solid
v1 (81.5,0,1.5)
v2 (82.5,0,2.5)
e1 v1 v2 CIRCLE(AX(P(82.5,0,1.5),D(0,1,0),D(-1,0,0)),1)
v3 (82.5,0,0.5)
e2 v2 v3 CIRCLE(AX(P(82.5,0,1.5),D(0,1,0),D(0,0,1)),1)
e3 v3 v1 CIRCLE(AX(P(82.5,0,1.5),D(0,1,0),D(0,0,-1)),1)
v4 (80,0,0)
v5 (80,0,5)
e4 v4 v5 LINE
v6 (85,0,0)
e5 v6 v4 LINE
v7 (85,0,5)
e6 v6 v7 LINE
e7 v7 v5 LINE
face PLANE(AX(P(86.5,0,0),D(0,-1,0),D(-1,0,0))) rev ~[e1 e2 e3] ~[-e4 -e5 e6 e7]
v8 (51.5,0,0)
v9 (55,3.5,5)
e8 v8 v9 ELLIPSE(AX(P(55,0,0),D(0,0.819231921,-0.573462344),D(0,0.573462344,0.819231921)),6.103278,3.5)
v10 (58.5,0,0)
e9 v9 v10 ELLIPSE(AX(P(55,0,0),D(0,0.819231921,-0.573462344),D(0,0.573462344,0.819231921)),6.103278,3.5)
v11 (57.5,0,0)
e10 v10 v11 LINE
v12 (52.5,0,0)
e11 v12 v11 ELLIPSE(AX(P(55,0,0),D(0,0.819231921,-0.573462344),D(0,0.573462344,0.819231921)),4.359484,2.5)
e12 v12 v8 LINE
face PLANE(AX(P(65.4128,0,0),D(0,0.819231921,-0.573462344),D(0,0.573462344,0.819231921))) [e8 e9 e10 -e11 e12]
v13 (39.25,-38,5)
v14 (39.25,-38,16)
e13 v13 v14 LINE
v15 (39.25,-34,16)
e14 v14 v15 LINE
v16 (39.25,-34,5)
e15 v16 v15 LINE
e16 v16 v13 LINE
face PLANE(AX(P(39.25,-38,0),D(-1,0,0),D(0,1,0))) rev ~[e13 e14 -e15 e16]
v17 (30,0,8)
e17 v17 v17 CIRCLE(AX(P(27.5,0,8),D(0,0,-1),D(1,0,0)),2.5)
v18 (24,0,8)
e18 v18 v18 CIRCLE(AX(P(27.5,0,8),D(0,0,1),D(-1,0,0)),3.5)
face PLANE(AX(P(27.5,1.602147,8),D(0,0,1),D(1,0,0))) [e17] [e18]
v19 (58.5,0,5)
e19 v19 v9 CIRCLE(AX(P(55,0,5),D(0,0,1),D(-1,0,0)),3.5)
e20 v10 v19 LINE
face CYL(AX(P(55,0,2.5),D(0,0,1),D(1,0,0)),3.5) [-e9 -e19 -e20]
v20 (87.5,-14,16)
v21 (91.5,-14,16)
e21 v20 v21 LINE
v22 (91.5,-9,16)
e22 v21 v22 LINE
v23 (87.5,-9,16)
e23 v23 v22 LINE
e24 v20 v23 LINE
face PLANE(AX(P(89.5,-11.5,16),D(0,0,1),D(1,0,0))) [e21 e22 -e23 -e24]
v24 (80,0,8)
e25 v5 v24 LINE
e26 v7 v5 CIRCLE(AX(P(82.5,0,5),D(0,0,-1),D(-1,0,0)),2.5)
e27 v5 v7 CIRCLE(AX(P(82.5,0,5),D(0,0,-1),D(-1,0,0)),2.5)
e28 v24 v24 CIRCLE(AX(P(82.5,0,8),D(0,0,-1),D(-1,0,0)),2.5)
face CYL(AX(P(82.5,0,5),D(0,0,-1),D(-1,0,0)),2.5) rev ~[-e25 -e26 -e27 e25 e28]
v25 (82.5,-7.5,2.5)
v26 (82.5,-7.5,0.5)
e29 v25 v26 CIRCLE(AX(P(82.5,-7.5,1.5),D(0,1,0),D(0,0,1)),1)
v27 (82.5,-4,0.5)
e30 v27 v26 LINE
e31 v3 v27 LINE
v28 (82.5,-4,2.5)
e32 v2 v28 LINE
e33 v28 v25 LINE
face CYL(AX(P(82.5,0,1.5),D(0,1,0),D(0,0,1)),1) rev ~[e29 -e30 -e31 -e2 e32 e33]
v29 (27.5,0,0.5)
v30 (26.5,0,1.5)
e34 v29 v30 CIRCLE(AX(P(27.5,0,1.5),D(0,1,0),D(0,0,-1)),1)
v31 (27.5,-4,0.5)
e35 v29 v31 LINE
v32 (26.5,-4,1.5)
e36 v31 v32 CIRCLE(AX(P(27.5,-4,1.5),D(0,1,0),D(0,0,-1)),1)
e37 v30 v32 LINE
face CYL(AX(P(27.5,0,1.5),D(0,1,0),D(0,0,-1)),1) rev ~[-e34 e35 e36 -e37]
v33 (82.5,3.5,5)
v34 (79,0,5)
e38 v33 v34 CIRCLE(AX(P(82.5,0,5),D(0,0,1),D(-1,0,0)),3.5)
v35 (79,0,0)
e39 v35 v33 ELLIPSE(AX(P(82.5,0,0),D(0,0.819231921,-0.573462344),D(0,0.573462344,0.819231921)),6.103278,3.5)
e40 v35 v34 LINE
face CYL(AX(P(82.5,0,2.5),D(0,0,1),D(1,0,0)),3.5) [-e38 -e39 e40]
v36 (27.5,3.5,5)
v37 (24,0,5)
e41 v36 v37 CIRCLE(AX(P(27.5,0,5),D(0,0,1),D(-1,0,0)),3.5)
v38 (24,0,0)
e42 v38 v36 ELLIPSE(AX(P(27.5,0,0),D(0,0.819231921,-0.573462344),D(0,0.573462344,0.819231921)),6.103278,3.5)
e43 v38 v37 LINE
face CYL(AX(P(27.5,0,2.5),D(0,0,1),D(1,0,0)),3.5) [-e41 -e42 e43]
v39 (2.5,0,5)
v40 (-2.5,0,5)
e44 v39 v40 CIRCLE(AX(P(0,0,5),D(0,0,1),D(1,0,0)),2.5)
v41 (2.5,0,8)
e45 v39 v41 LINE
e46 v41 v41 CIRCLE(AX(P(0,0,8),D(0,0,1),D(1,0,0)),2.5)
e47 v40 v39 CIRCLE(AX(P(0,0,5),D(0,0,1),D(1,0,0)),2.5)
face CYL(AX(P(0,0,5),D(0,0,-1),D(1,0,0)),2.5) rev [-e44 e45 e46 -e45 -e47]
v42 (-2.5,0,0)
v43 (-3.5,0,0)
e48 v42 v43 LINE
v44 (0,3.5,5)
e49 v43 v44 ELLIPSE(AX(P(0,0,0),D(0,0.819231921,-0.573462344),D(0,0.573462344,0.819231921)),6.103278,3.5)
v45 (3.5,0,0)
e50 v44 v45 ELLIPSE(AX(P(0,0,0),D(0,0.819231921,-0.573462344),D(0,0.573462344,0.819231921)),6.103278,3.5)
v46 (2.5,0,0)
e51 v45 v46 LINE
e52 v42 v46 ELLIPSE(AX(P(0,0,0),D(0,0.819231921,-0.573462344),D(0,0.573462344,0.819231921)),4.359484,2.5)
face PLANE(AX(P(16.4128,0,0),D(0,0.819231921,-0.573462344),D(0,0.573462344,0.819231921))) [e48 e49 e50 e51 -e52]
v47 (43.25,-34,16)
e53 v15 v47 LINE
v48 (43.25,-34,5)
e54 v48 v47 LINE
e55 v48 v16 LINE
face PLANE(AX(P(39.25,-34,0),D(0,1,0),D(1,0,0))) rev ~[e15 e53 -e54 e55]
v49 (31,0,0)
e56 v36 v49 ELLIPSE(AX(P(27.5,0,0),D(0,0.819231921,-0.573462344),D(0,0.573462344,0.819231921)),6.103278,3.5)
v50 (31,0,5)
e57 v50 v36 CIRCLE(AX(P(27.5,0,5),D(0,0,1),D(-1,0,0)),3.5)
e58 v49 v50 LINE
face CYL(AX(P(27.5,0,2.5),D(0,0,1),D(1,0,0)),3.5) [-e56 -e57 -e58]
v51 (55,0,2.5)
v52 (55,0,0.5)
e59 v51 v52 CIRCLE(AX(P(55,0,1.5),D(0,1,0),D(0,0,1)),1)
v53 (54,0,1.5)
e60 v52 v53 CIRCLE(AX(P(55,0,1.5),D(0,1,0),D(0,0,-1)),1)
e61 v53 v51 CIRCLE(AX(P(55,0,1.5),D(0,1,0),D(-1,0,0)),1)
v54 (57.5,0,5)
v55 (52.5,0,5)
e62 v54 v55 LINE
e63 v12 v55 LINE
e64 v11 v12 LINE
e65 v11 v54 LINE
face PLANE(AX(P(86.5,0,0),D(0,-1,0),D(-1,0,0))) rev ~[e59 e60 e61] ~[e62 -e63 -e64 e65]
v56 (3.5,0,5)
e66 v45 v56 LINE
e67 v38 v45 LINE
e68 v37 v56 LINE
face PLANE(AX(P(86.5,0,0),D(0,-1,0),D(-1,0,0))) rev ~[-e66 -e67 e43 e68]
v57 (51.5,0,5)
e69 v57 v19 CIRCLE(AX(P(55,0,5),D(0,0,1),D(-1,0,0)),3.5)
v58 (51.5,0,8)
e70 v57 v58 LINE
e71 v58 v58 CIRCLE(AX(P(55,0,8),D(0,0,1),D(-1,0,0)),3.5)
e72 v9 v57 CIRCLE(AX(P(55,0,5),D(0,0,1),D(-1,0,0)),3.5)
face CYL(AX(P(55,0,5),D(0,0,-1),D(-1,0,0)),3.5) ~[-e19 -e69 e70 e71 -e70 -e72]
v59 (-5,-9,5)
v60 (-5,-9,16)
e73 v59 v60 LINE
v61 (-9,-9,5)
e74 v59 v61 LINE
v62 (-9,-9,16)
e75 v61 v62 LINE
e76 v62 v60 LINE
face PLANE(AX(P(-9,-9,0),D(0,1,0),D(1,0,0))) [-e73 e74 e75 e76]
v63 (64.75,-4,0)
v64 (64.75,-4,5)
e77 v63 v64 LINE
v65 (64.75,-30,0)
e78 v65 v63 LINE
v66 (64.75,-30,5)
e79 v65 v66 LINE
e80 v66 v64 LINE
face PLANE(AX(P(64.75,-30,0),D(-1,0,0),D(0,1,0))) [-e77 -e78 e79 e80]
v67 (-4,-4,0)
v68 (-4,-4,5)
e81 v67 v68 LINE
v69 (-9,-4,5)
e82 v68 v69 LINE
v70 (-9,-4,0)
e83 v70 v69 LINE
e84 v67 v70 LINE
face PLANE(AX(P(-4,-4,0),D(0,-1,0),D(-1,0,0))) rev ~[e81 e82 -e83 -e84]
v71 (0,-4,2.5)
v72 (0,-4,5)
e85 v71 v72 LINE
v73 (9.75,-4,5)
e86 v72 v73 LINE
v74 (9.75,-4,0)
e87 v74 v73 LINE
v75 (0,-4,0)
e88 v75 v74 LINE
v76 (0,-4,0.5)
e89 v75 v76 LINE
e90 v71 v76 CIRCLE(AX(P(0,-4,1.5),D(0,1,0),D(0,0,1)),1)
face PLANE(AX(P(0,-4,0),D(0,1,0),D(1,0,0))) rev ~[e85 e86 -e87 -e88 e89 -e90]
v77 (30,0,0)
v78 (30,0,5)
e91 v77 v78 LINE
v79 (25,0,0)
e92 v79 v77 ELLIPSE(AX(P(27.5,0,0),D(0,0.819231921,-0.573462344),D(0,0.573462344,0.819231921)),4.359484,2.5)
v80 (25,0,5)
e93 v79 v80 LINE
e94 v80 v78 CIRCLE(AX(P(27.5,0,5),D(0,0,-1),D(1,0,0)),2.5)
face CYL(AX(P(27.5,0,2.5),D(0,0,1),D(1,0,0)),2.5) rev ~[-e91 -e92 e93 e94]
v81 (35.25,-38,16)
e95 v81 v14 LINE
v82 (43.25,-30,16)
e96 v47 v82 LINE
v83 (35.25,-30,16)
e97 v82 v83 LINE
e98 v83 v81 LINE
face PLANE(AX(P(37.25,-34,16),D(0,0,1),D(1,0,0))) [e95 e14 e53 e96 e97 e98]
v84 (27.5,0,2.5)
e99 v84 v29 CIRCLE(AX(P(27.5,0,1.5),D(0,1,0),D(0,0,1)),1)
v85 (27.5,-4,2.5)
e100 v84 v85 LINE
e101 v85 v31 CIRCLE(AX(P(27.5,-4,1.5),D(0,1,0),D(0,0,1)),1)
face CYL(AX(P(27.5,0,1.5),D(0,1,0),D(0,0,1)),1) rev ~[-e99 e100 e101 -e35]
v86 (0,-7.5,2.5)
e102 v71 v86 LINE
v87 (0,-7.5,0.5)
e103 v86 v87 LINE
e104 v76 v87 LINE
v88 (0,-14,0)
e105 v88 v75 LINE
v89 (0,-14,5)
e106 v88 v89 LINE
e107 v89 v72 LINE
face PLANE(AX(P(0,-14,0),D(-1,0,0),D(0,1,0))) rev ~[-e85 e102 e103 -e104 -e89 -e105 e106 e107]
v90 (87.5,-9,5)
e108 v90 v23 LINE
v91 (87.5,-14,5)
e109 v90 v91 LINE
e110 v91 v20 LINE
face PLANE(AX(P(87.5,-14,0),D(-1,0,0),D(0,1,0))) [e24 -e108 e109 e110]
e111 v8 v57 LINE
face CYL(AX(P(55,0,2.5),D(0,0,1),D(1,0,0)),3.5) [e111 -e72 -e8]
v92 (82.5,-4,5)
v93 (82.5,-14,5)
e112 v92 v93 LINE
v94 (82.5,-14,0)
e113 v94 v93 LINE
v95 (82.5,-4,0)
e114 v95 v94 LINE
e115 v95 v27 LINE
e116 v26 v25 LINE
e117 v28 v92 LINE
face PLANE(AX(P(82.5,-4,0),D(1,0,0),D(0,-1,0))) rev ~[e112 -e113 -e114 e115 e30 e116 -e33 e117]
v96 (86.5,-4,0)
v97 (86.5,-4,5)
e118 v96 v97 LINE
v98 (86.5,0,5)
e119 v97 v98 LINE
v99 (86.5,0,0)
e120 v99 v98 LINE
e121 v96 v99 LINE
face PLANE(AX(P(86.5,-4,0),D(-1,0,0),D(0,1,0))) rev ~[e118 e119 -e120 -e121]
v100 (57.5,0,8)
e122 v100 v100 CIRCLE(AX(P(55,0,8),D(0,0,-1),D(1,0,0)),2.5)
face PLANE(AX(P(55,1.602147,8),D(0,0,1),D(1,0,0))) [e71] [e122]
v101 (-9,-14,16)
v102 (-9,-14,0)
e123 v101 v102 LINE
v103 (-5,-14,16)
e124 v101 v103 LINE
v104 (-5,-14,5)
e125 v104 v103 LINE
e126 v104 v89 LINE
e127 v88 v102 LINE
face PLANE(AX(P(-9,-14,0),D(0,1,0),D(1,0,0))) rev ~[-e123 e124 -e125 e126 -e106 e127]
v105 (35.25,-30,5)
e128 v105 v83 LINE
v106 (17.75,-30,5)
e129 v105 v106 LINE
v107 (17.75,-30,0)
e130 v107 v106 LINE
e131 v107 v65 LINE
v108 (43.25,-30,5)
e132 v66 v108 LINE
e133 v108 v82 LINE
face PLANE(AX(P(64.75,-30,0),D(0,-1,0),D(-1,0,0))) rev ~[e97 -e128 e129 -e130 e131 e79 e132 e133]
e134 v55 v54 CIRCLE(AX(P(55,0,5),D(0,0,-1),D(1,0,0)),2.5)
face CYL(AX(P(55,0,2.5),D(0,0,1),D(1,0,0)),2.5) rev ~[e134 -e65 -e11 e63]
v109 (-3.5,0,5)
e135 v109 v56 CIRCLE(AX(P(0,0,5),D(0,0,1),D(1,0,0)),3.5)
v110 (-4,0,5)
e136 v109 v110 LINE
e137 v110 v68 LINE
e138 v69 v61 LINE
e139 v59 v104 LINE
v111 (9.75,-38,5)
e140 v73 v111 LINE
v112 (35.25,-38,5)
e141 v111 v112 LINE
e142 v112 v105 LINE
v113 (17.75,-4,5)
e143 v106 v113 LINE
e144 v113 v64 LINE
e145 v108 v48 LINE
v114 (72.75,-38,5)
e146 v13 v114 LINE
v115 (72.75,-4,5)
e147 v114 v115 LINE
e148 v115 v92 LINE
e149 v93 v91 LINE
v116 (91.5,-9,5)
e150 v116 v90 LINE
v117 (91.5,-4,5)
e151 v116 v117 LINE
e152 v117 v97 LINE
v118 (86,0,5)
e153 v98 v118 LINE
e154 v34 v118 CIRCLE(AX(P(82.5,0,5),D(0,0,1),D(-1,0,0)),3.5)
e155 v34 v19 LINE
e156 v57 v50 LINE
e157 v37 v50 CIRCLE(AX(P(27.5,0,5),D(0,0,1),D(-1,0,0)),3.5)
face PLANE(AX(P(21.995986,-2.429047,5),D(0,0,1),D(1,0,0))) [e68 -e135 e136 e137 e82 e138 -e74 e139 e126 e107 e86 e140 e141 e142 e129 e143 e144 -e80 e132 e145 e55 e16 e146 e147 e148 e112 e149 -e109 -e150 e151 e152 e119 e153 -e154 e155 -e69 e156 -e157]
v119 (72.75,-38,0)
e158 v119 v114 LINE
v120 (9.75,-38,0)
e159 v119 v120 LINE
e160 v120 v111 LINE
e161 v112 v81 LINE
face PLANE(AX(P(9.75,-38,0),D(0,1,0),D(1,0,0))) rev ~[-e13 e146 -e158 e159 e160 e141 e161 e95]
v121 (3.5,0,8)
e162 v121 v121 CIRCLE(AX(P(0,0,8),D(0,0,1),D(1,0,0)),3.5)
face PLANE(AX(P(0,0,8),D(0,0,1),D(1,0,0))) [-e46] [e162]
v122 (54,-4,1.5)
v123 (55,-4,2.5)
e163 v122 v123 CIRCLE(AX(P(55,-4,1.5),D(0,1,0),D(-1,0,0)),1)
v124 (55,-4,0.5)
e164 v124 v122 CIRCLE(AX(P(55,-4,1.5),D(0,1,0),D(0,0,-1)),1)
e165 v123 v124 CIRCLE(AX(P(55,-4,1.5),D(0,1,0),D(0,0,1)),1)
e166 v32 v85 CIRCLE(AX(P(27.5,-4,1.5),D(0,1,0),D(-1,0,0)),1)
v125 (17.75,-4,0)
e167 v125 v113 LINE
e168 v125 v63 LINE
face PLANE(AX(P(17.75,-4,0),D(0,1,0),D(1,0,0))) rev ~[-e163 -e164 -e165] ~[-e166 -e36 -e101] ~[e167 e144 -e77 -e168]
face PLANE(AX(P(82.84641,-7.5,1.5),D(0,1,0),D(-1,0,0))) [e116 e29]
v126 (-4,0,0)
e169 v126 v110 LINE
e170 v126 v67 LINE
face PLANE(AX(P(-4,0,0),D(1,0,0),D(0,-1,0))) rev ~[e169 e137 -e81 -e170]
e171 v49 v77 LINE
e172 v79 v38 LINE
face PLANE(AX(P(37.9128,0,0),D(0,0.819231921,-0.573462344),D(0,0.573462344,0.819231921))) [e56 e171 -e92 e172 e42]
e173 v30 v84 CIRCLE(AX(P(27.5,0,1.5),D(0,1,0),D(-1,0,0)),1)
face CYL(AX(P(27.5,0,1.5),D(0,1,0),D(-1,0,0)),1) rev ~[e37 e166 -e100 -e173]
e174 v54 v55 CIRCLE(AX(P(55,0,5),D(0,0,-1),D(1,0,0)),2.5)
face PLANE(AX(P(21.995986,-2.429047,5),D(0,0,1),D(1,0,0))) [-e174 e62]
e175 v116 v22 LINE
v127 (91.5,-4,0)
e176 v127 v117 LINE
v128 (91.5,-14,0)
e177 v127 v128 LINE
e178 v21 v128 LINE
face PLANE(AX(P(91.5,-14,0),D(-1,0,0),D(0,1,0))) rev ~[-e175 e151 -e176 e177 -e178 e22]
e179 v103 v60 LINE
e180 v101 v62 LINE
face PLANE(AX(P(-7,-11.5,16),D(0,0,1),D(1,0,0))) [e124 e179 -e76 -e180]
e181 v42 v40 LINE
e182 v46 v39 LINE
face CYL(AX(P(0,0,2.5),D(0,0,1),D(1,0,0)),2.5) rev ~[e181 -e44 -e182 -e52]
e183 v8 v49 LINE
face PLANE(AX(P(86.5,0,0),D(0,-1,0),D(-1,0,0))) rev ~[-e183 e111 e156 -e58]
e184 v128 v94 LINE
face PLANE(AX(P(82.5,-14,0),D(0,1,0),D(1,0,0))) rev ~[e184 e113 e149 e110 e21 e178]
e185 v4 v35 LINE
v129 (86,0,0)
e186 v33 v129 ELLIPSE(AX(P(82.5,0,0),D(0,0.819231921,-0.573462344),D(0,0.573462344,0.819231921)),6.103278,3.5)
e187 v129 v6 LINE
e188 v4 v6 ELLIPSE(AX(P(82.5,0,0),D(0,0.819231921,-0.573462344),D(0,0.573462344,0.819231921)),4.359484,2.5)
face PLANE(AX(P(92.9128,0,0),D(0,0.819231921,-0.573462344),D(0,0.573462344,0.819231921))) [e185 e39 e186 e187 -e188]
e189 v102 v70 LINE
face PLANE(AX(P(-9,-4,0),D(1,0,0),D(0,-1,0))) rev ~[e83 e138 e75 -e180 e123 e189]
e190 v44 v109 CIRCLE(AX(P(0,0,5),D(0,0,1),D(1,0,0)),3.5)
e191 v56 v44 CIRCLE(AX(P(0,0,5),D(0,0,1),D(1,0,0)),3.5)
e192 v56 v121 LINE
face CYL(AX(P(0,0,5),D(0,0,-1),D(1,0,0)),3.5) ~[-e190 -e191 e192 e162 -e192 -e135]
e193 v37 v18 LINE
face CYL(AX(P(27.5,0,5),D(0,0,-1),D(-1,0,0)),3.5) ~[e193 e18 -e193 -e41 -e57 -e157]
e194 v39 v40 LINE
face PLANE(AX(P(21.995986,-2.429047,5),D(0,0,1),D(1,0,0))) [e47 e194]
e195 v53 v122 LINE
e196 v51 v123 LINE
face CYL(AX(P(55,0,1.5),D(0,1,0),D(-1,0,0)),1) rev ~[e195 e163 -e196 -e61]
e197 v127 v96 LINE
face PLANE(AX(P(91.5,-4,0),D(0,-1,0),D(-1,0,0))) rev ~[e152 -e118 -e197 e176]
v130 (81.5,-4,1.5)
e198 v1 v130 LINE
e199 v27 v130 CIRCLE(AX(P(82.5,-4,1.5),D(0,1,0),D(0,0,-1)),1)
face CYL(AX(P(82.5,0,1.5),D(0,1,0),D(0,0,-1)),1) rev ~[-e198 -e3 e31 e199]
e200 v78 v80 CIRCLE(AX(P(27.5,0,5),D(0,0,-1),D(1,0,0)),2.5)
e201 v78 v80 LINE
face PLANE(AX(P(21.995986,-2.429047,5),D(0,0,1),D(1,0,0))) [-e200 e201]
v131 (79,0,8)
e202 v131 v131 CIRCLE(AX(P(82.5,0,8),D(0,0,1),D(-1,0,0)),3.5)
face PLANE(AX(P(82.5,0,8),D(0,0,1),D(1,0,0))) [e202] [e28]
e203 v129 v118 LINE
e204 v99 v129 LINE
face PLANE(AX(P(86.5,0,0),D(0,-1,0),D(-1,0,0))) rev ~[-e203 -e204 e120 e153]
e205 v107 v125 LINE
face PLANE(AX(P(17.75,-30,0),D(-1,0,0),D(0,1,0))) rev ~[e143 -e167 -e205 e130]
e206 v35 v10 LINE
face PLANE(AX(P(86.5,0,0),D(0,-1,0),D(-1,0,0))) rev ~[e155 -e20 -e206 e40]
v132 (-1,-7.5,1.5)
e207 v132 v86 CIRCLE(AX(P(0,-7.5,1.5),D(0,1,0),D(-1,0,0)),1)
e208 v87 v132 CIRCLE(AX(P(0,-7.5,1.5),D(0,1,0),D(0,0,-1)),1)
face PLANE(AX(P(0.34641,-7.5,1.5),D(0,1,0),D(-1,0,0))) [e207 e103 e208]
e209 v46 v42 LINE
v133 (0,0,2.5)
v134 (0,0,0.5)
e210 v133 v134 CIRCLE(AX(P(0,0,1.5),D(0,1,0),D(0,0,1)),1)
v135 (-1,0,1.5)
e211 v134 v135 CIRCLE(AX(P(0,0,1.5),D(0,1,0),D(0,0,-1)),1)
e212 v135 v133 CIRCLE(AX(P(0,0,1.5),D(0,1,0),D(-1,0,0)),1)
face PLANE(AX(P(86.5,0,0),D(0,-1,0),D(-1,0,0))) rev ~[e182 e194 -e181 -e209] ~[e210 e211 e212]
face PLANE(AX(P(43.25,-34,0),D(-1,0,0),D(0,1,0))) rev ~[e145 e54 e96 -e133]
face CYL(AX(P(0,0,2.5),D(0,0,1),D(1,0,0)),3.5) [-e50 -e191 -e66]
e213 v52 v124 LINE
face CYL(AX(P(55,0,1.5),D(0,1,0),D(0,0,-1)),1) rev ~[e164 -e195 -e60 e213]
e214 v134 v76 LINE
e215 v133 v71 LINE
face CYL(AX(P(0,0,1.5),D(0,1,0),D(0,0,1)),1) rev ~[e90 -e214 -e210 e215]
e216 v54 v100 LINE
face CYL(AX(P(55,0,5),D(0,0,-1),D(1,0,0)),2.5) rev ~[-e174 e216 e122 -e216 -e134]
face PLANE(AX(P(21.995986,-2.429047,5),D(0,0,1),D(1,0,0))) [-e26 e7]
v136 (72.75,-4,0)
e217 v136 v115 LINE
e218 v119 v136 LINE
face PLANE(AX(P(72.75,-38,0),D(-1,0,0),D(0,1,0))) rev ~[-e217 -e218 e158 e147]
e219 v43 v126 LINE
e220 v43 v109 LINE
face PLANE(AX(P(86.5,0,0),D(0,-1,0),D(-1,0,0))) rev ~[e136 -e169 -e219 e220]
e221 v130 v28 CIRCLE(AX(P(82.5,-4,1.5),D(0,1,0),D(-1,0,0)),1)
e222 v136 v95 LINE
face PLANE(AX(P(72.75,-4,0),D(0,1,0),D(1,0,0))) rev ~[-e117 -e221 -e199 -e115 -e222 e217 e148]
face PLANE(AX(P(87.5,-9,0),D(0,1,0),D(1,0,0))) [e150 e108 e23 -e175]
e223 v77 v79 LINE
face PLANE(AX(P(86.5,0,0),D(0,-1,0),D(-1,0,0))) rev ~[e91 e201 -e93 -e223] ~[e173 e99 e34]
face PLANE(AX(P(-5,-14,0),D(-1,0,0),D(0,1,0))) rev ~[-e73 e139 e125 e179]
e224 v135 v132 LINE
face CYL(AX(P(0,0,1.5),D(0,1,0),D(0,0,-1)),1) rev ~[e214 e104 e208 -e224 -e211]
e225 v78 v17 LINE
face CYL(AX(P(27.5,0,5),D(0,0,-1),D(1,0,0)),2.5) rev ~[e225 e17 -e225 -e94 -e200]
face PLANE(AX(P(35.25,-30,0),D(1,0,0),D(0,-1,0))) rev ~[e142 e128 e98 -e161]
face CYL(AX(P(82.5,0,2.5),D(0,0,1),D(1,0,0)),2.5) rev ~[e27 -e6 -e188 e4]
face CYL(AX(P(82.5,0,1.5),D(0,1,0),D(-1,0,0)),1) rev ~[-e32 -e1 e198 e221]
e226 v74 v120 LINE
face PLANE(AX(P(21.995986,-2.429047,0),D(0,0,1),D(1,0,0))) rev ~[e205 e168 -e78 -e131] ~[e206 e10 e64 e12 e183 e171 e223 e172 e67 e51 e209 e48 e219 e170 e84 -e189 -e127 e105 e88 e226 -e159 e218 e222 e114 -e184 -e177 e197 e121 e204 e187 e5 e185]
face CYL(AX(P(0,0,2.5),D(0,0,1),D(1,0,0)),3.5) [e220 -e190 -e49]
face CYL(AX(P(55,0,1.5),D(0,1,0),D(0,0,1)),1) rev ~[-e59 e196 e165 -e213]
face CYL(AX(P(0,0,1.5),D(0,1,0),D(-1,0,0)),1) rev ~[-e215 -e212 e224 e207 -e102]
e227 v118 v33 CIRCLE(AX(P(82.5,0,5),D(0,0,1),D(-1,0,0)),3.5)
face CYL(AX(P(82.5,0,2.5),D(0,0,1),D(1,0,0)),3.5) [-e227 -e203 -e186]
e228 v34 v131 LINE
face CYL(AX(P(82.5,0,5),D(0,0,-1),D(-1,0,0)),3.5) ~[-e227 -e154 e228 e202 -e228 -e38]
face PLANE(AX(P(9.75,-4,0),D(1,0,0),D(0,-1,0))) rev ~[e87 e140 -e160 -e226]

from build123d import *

# Parameters (mm, degrees)
F0_W         = 4
F0_H         = 26
F0_W_2       = 2
F0_H_2       = 4
F0_H_3       = 5
F1_DEPTH     = 5
F2_DEPTH     = 16
F3_R         = 3.5
F3_R_2       = 2.5
F4_DEPTH     = 3
F6_DEPTH     = 7.5
F7_T4_DEPTH  = 26.8255996257
F7_S5_R      = 3.5
F7_T6_DEPTH  = 15
F7_S7_R      = 2.5
F7_T8_DEPTH  = 15
F7_T12_DEPTH = 26.8255996257
F7_S13_R     = 3.5
F7_T14_DEPTH = 15
F7_S15_R     = 2.5
F7_T16_DEPTH = 15
F7_T20_DEPTH = 26.8255996257
F7_S21_R     = 3.5
F7_T22_DEPTH = 15
F7_S23_R     = 2.5
F7_T24_DEPTH = 15
F7_T28_DEPTH = 26.8255996257
F7_S29_R     = 3.5
F7_T30_DEPTH = 15
F7_S31_R     = 2.5
F7_T32_DEPTH = 15
F7_T36_DEPTH = 26.8255996257
F7_S37_R     = 3.5
F7_T38_DEPTH = 15
F7_S39_R     = 2.5
F7_T40_DEPTH = 15
F7_T44_DEPTH = 26.8255996257
F7_S45_R     = 3.5
F7_T46_DEPTH = 15
F7_S47_R     = 2.5
F7_T48_DEPTH = 15
F7_T52_DEPTH = 26.8255996257
F7_S53_R     = 3.5
F7_T54_DEPTH = 15
F7_S55_R     = 2.5
F7_T56_DEPTH = 15
F7_T60_DEPTH = 26.8255996257
F7_S61_R     = 3.5
F7_T62_DEPTH = 15
F7_S63_R     = 2.5
F7_T64_DEPTH = 15


# Not quite as in the source:
# - a fillet or chamfer that OpenCascade refuses, or shapes differently, is made with other operations: its cross-section is extruded or revolved along the edge and cut away or added


with BuildPart() as f1:
    # F0 (on Top) → F1 (new body)
    with BuildSketch(Plane.XY):
        with BuildLine():
            ThreePointArc((27.5, -4), (24.6715728753, -2.8284271247), (23.5, 0))
            Line((23.5, 0), (17.75, 0))
            Line((17.75, 0), (17.75, -4))
            Line((17.75, -4), (27.5, -4))
        make_face()
        with Locations((15.75, -17)):
            Rectangle(F0_W, F0_H)
        with BuildLine():
            Line((52.5, 0), (51, 0))
            ThreePointArc((51, 0), (52.1715728753, -2.8284271247), (55, -4))
            Line((55, -4), (55, -2.5))
            ThreePointArc((55, -2.5), (53.232233047, -1.767766953), (52.5, 0))
        make_face()
        with Locations((42.25, -32)):
            Rectangle(F0_W_2, F0_H_2)
        with BuildLine():
            ThreePointArc((82.5, -2.5), (84.267766953, -1.767766953), (85, 0))
            Line((85, 0), (82.5, 0))
            Line((82.5, 0), (82.5, -2.5))
        make_face()
        with BuildLine():
            Line((82.5, 0), (80, 0))
            ThreePointArc((80, 0), (80.732233047, -1.767766953), (82.5, -2.5))
            Line((82.5, -2.5), (82.5, 0))
        make_face()
        Polygon((47.25, -38), (47.25, -30), (43.25, -30), (43.25, -34), (43.25, -38), align=None)
        with BuildLine():
            Line((64.75, 0), (59, 0))
            ThreePointArc((59, 0), (57.8284271247, -2.8284271247), (55, -4))
            Line((55, -4), (64.75, -4))
            Line((64.75, -4), (64.75, 0))
        make_face()
        with Locations((11.75, -2)):
            Rectangle(F0_W, F0_H_2)
        with Locations((42.25, -36)):
            Rectangle(F0_W_2, F0_H_2)
        with Locations((40.25, -32)):
            Rectangle(F0_W_2, F0_H_2)
        with Locations((11.75, -17)):
            Rectangle(F0_W, F0_H)
        with Locations((70.75, -2)):
            Rectangle(F0_W, F0_H_2)
        with BuildLine():
            Line((25, 0), (23.5, 0))
            ThreePointArc((23.5, 0), (24.6715728753, -2.8284271247), (27.5, -4))
            Line((27.5, -4), (27.5, -2.5))
            ThreePointArc((27.5, -2.5), (25.732233047, -1.767766953), (25, 0))
        make_face()
        with Locations((40.25, -36)):
            Rectangle(F0_W_2, F0_H_2)
        Polygon((35.25, -30), (35.25, -38), (39.25, -38), (39.25, -34), (39.25, -30), align=None)
        with BuildLine():
            ThreePointArc((55, -4), (57.8284271247, -2.8284271247), (59, 0))
            Line((59, 0), (57.5, 0))
            ThreePointArc((57.5, 0), (56.767766953, -1.767766953), (55, -2.5))
            Line((55, -2.5), (55, -4))
        make_face()
        with Locations((70.75, -17)):
            Rectangle(F0_W, F0_H)
        with Locations((66.75, -2)):
            Rectangle(F0_W, F0_H_2)
        with BuildLine():
            Line((55, 0), (52.5, 0))
            ThreePointArc((52.5, 0), (53.232233047, -1.767766953), (55, -2.5))
            Line((55, -2.5), (55, 0))
        make_face()
        with BuildLine():
            Line((0, -4), (0, -2.5))
            ThreePointArc((0, -2.5), (-1.767766953, -1.767766953), (-2.5, 0))
            Line((-2.5, 0), (-4, 0))
            ThreePointArc((-4, 0), (-2.8284271247, -2.8284271247), (0, -4))
        make_face()
        Polygon((86.5, -4), (82.5, -4), (82.5, -14), (87.5, -14), (87.5, -9), (87.5, -4), align=None)
        with BuildLine():
            Line((-4, -4), (0, -4))
            ThreePointArc((0, -4), (-2.8284271247, -2.8284271247), (-4, 0))
            Line((-4, 0), (-4, -4))
        make_face()
        with BuildLine():
            Line((86.5, -4), (86.5, 0))
            ThreePointArc((86.5, 0), (85.3284271247, -2.8284271247), (82.5, -4))
            Line((82.5, -4), (86.5, -4))
        make_face()
        with Locations((-7, -6.5)):
            Rectangle(F0_W, F0_H_3)
        with Locations((89.5, -6.5)):
            Rectangle(F0_W, F0_H_3)
        with Locations((-7, -11.5)):
            Rectangle(F0_W, F0_H_3)
        with Locations((89.5, -11.5)):
            Rectangle(F0_W, F0_H_3)
        with BuildLine():
            Line((2.5, 0), (0, 0))
            Line((0, 0), (0, -2.5))
            ThreePointArc((0, -2.5), (1.767766953, -1.767766953), (2.5, 0))
        make_face()
        with BuildLine():
            Line((9.75, 0), (4, 0))
            ThreePointArc((4, 0), (2.8284271247, -2.8284271247), (0, -4))
            Line((0, -4), (9.75, -4))
            Line((9.75, -4), (9.75, 0))
        make_face()
        with BuildLine():
            Line((27.5, 0), (25, 0))
            ThreePointArc((25, 0), (25.732233047, -1.767766953), (27.5, -2.5))
            Line((27.5, -2.5), (27.5, 0))
        make_face()
        with BuildLine():
            ThreePointArc((27.5, -2.5), (29.267766953, -1.767766953), (30, 0))
            Line((30, 0), (27.5, 0))
            Line((27.5, 0), (27.5, -2.5))
        make_face()
        with Locations((66.75, -17)):
            Rectangle(F0_W, F0_H)
        with BuildLine():
            ThreePointArc((27.5, -4), (30.3284271247, -2.8284271247), (31.5, 0))
            Line((31.5, 0), (30, 0))
            ThreePointArc((30, 0), (29.267766953, -1.767766953), (27.5, -2.5))
            Line((27.5, -2.5), (27.5, -4))
        make_face()
        with BuildLine():
            Line((0, -2.5), (0, 0))
            Line((0, 0), (-2.5, 0))
            ThreePointArc((-2.5, 0), (-1.767766953, -1.767766953), (0, -2.5))
        make_face()
        with BuildLine():
            ThreePointArc((55, -2.5), (56.767766953, -1.767766953), (57.5, 0))
            Line((57.5, 0), (55, 0))
            Line((55, 0), (55, -2.5))
        make_face()
        with BuildLine():
            ThreePointArc((82.5, -4), (85.3284271247, -2.8284271247), (86.5, 0))
            Line((86.5, 0), (85, 0))
            ThreePointArc((85, 0), (84.267766953, -1.767766953), (82.5, -2.5))
            Line((82.5, -2.5), (82.5, -4))
        make_face()
        Polygon((13.75, -30), (9.75, -30), (9.75, -38), (35.25, -38), (35.25, -30), (17.75, -30), align=None)
        with BuildLine():
            Line((51, 0), (31.5, 0))
            ThreePointArc((31.5, 0), (30.3284271247, -2.8284271247), (27.5, -4))
            Line((27.5, -4), (55, -4))
            ThreePointArc((55, -4), (52.1715728753, -2.8284271247), (51, 0))
        make_face()
        with BuildLine():
            ThreePointArc((82.5, -4), (79.6715728753, -2.8284271247), (78.5, 0))
            Line((78.5, 0), (72.75, 0))
            Line((72.75, 0), (72.75, -4))
            Line((72.75, -4), (82.5, -4))
        make_face()
        with Locations((15.75, -2)):
            Rectangle(F0_W, F0_H_2)
        with BuildLine():
            Line((4, 0), (2.5, 0))
            ThreePointArc((2.5, 0), (1.767766953, -1.767766953), (0, -2.5))
            Line((0, -2.5), (0, -4))
            ThreePointArc((0, -4), (2.8284271247, -2.8284271247), (4, 0))
        make_face()
        Polygon((68.75, -30), (64.75, -30), (47.25, -30), (47.25, -38), (72.75, -38), (72.75, -30), align=None)
        Polygon((0, -14), (0, -4), (-4, -4), (-5, -4), (-5, -9), (-5, -14), align=None)
        with BuildLine():
            Line((80, 0), (78.5, 0))
            ThreePointArc((78.5, 0), (79.6715728753, -2.8284271247), (82.5, -4))
            Line((82.5, -4), (82.5, -2.5))
            ThreePointArc((82.5, -2.5), (80.732233047, -1.767766953), (80, 0))
        make_face()
    extrude(amount=F1_DEPTH)

    # F0 (on Top) → F2 (join)
    with BuildSketch(Plane.XY):
        with Locations((-7, -11.5)):
            Rectangle(F0_W, F0_H_3)
        with Locations((89.5, -11.5)):
            Rectangle(F0_W, F0_H_3)
        Polygon((35.25, -30), (35.25, -38), (39.25, -38), (39.25, -34), (39.25, -30), align=None)
        with Locations((40.25, -32)):
            Rectangle(F0_W_2, F0_H_2)
        with Locations((42.25, -32)):
            Rectangle(F0_W_2, F0_H_2)
    extrude(amount=F2_DEPTH)

    # F3 (on face) → F4 (join)
    with BuildSketch(Plane.XY.offset(5)):
        Circle(F3_R)
        Circle(F3_R_2, mode=Mode.SUBTRACT)
        with BuildLine():
            ThreePointArc((86, 0), (82.5, 3.5), (79, 0))
            ThreePointArc((79, 0), (82.5, -3.5), (86, 0))
        make_face()
        with BuildLine():
            ThreePointArc((85, 0), (82.5, -2.5), (80, 0))
            ThreePointArc((80, 0), (82.5, 2.5), (85, 0))
        make_face(mode=Mode.SUBTRACT)
        with BuildLine():
            ThreePointArc((58.5, 0), (55, 3.5), (51.5, 0))
            Line((51.5, 0), (52.5, 0))
            ThreePointArc((52.5, 0), (55, 2.5), (57.5, 0))
            Line((57.5, 0), (58.5, 0))
        make_face()
        with BuildLine():
            Line((52.5, 0), (51.5, 0))
            ThreePointArc((51.5, 0), (55, -3.5), (58.5, 0))
            Line((58.5, 0), (57.5, 0))
            ThreePointArc((57.5, 0), (55, -2.5), (52.5, 0))
        make_face()
        with BuildLine():
            ThreePointArc((31, 0), (27.5, 3.5), (24, 0))
            Line((24, 0), (25, 0))
            ThreePointArc((25, 0), (27.5, 2.5), (30, 0))
            Line((30, 0), (31, 0))
        make_face()
        with BuildLine():
            Line((25, 0), (24, 0))
            ThreePointArc((24, 0), (27.5, -3.5), (31, 0))
            Line((31, 0), (30, 0))
            ThreePointArc((30, 0), (27.5, -2.5), (25, 0))
        make_face()
    extrude(amount=F4_DEPTH)

    # F5 (on face) → F6 (cut)
    with BuildSketch(Plane(origin=(0, 0, 0), x_dir=(-1, 0, 0), z_dir=(0, 1, 0))):
        with BuildLine():
            ThreePointArc((0, 2.5), (-1, 1.5), (0, 0.5))
            Line((0, 0.5), (0, 2.5))
        make_face()
        with BuildLine():
            Line((0, 2.5), (0, 0.5))
            ThreePointArc((0, 0.5), (0.7071067812, 0.7928932188), (1, 1.5))
            ThreePointArc((1, 1.5), (0.7071067812, 2.2071067812), (0, 2.5))
        make_face()
        with BuildLine():
            ThreePointArc((-82.5, 2.5), (-83.5, 1.5), (-82.5, 0.5))
            Line((-82.5, 0.5), (-82.5, 2.5))
        make_face()
        with BuildLine():
            Line((-82.5, 2.5), (-82.5, 0.5))
            ThreePointArc((-82.5, 0.5), (-81.7928932188, 0.7928932188), (-81.5, 1.5))
            ThreePointArc((-81.5, 1.5), (-81.7928932188, 2.2071067812), (-82.5, 2.5))
        make_face()
        with BuildLine():
            ThreePointArc((-55, 2.5), (-56, 1.5), (-55, 0.5))
            Line((-55, 0.5), (-55, 2.5))
        make_face()
        with BuildLine():
            Line((-55, 2.5), (-55, 0.5))
            ThreePointArc((-55, 0.5), (-54.2928932188, 0.7928932188), (-54, 1.5))
            ThreePointArc((-54, 1.5), (-54.2928932188, 2.2071067812), (-55, 2.5))
        make_face()
        with BuildLine():
            ThreePointArc((-27.5, 2.5), (-28.5, 1.5), (-27.5, 0.5))
            Line((-27.5, 0.5), (-27.5, 2.5))
        make_face()
        with BuildLine():
            Line((-27.5, 2.5), (-27.5, 0.5))
            ThreePointArc((-27.5, 0.5), (-26.7928932188, 0.7928932188), (-26.5, 1.5))
            ThreePointArc((-26.5, 1.5), (-26.7928932188, 2.2071067812), (-27.5, 2.5))
        make_face()
    extrude(amount=-F6_DEPTH, mode=Mode.SUBTRACT)

    # F7: chamfer of 5 x 3.5 on 8 edges, made by hand


with BuildPart() as f7_tool2:
    # F7_s3 → F7_t4 (new body)
    with BuildSketch(Plane.YZ.offset(16.4127998128)):
        Polygon((0, 0), (3.5, 5), (0, 5), align=None)
    extrude(amount=-F7_T4_DEPTH)

    # F7_s5 → F7_t6 (intersect, symmetric)
    with BuildSketch(Plane.XY.offset(2.5)):
        Circle(F7_S5_R)
    extrude(amount=F7_T6_DEPTH, both=True, mode=Mode.INTERSECT)

    # F7_s7 → F7_t8 (cut, symmetric)
    with BuildSketch(Plane.XY.offset(2.5)):
        Circle(F7_S7_R)
    extrude(amount=F7_T8_DEPTH, both=True, mode=Mode.SUBTRACT)


with BuildPart() as f1_1:
    add(f1.part)

    # F7_t1: union F7_tool2
    add(f7_tool2.part)


with BuildPart() as f7_tool10:
    # F7_s11 → F7_t12 (new body)
    with BuildSketch(Plane.YZ.offset(37.9127998128)):
        Polygon((0, 0), (3.5, 5), (0, 5), align=None)
    extrude(amount=-F7_T12_DEPTH)

    # F7_s13 → F7_t14 (intersect, symmetric)
    with BuildSketch(Plane.XY.offset(2.5)):
        with Locations((27.5, 0)):
            Circle(F7_S13_R)
    extrude(amount=F7_T14_DEPTH, both=True, mode=Mode.INTERSECT)

    # F7_s15 → F7_t16 (cut, symmetric)
    with BuildSketch(Plane.XY.offset(2.5)):
        with Locations((27.5, 0)):
            Circle(F7_S15_R)
    extrude(amount=F7_T16_DEPTH, both=True, mode=Mode.SUBTRACT)


with BuildPart() as f1_2:
    add(f1_1.part)

    # F7_t9: union F7_tool10
    add(f7_tool10.part)


with BuildPart() as f7_tool18:
    # F7_s19 → F7_t20 (new body)
    with BuildSketch(Plane.YZ.offset(65.4127998128)):
        Polygon((0, 0), (3.5, 5), (0, 5), align=None)
    extrude(amount=-F7_T20_DEPTH)

    # F7_s21 → F7_t22 (intersect, symmetric)
    with BuildSketch(Plane.XY.offset(2.5)):
        with Locations((55, 0)):
            Circle(F7_S21_R)
    extrude(amount=F7_T22_DEPTH, both=True, mode=Mode.INTERSECT)

    # F7_s23 → F7_t24 (cut, symmetric)
    with BuildSketch(Plane.XY.offset(2.5)):
        with Locations((55, 0)):
            Circle(F7_S23_R)
    extrude(amount=F7_T24_DEPTH, both=True, mode=Mode.SUBTRACT)


with BuildPart() as f1_3:
    add(f1_2.part)

    # F7_t17: union F7_tool18
    add(f7_tool18.part)


with BuildPart() as f7_tool26:
    # F7_s27 → F7_t28 (new body)
    with BuildSketch(Plane.YZ.offset(43.9127998128)):
        Polygon((0, 0), (3.5, 5), (0, 5), align=None)
    extrude(amount=-F7_T28_DEPTH)

    # F7_s29 → F7_t30 (intersect, symmetric)
    with BuildSketch(Plane.XY.offset(2.5)):
        with Locations((27.5, 0)):
            Circle(F7_S29_R)
    extrude(amount=F7_T30_DEPTH, both=True, mode=Mode.INTERSECT)

    # F7_s31 → F7_t32 (cut, symmetric)
    with BuildSketch(Plane.XY.offset(2.5)):
        with Locations((27.5, 0)):
            Circle(F7_S31_R)
    extrude(amount=F7_T32_DEPTH, both=True, mode=Mode.SUBTRACT)


with BuildPart() as f1_4:
    add(f1_3.part)

    # F7_t25: union F7_tool26
    add(f7_tool26.part)


with BuildPart() as f7_tool34:
    # F7_s35 → F7_t36 (new body)
    with BuildSketch(Plane.YZ.offset(92.9127998128)):
        Polygon((0, 0), (3.5, 5), (0, 5), align=None)
    extrude(amount=-F7_T36_DEPTH)

    # F7_s37 → F7_t38 (intersect, symmetric)
    with BuildSketch(Plane.XY.offset(2.5)):
        with Locations((82.5, 0)):
            Circle(F7_S37_R)
    extrude(amount=F7_T38_DEPTH, both=True, mode=Mode.INTERSECT)

    # F7_s39 → F7_t40 (cut, symmetric)
    with BuildSketch(Plane.XY.offset(2.5)):
        with Locations((82.5, 0)):
            Circle(F7_S39_R)
    extrude(amount=F7_T40_DEPTH, both=True, mode=Mode.SUBTRACT)


with BuildPart() as f1_5:
    add(f1_4.part)

    # F7_t33: union F7_tool34
    add(f7_tool34.part)


with BuildPart() as f7_tool42:
    # F7_s43 → F7_t44 (new body)
    with BuildSketch(Plane.YZ.offset(71.4127998128)):
        Polygon((0, 0), (3.5, 5), (0, 5), align=None)
    extrude(amount=-F7_T44_DEPTH)

    # F7_s45 → F7_t46 (intersect, symmetric)
    with BuildSketch(Plane.XY.offset(2.5)):
        with Locations((55, 0)):
            Circle(F7_S45_R)
    extrude(amount=F7_T46_DEPTH, both=True, mode=Mode.INTERSECT)

    # F7_s47 → F7_t48 (cut, symmetric)
    with BuildSketch(Plane.XY.offset(2.5)):
        with Locations((55, 0)):
            Circle(F7_S47_R)
    extrude(amount=F7_T48_DEPTH, both=True, mode=Mode.SUBTRACT)


with BuildPart() as f1_6:
    add(f1_5.part)

    # F7_t41: union F7_tool42
    add(f7_tool42.part)


with BuildPart() as f7_tool50:
    # F7_s51 → F7_t52 (new body)
    with BuildSketch(Plane.YZ.offset(10.4127998128)):
        Polygon((0, 0), (3.5, 5), (0, 5), align=None)
    extrude(amount=-F7_T52_DEPTH)

    # F7_s53 → F7_t54 (intersect, symmetric)
    with BuildSketch(Plane.XY.offset(2.5)):
        Circle(F7_S53_R)
    extrude(amount=F7_T54_DEPTH, both=True, mode=Mode.INTERSECT)

    # F7_s55 → F7_t56 (cut, symmetric)
    with BuildSketch(Plane.XY.offset(2.5)):
        Circle(F7_S55_R)
    extrude(amount=F7_T56_DEPTH, both=True, mode=Mode.SUBTRACT)


with BuildPart() as f1_7:
    add(f1_6.part)

    # F7_t49: union F7_tool50
    add(f7_tool50.part)


with BuildPart() as f7_tool58:
    # F7_s59 → F7_t60 (new body)
    with BuildSketch(Plane.YZ.offset(98.9127998128)):
        Polygon((0, 0), (3.5, 5), (0, 5), align=None)
    extrude(amount=-F7_T60_DEPTH)

    # F7_s61 → F7_t62 (intersect, symmetric)
    with BuildSketch(Plane.XY.offset(2.5)):
        with Locations((82.5, 0)):
            Circle(F7_S61_R)
    extrude(amount=F7_T62_DEPTH, both=True, mode=Mode.INTERSECT)

    # F7_s63 → F7_t64 (cut, symmetric)
    with BuildSketch(Plane.XY.offset(2.5)):
        with Locations((82.5, 0)):
            Circle(F7_S63_R)
    extrude(amount=F7_T64_DEPTH, both=True, mode=Mode.SUBTRACT)


with BuildPart() as f1_8:
    add(f1_7.part)

    # F7_t57: union F7_tool58
    add(f7_tool58.part)


solid = f1_8.part
